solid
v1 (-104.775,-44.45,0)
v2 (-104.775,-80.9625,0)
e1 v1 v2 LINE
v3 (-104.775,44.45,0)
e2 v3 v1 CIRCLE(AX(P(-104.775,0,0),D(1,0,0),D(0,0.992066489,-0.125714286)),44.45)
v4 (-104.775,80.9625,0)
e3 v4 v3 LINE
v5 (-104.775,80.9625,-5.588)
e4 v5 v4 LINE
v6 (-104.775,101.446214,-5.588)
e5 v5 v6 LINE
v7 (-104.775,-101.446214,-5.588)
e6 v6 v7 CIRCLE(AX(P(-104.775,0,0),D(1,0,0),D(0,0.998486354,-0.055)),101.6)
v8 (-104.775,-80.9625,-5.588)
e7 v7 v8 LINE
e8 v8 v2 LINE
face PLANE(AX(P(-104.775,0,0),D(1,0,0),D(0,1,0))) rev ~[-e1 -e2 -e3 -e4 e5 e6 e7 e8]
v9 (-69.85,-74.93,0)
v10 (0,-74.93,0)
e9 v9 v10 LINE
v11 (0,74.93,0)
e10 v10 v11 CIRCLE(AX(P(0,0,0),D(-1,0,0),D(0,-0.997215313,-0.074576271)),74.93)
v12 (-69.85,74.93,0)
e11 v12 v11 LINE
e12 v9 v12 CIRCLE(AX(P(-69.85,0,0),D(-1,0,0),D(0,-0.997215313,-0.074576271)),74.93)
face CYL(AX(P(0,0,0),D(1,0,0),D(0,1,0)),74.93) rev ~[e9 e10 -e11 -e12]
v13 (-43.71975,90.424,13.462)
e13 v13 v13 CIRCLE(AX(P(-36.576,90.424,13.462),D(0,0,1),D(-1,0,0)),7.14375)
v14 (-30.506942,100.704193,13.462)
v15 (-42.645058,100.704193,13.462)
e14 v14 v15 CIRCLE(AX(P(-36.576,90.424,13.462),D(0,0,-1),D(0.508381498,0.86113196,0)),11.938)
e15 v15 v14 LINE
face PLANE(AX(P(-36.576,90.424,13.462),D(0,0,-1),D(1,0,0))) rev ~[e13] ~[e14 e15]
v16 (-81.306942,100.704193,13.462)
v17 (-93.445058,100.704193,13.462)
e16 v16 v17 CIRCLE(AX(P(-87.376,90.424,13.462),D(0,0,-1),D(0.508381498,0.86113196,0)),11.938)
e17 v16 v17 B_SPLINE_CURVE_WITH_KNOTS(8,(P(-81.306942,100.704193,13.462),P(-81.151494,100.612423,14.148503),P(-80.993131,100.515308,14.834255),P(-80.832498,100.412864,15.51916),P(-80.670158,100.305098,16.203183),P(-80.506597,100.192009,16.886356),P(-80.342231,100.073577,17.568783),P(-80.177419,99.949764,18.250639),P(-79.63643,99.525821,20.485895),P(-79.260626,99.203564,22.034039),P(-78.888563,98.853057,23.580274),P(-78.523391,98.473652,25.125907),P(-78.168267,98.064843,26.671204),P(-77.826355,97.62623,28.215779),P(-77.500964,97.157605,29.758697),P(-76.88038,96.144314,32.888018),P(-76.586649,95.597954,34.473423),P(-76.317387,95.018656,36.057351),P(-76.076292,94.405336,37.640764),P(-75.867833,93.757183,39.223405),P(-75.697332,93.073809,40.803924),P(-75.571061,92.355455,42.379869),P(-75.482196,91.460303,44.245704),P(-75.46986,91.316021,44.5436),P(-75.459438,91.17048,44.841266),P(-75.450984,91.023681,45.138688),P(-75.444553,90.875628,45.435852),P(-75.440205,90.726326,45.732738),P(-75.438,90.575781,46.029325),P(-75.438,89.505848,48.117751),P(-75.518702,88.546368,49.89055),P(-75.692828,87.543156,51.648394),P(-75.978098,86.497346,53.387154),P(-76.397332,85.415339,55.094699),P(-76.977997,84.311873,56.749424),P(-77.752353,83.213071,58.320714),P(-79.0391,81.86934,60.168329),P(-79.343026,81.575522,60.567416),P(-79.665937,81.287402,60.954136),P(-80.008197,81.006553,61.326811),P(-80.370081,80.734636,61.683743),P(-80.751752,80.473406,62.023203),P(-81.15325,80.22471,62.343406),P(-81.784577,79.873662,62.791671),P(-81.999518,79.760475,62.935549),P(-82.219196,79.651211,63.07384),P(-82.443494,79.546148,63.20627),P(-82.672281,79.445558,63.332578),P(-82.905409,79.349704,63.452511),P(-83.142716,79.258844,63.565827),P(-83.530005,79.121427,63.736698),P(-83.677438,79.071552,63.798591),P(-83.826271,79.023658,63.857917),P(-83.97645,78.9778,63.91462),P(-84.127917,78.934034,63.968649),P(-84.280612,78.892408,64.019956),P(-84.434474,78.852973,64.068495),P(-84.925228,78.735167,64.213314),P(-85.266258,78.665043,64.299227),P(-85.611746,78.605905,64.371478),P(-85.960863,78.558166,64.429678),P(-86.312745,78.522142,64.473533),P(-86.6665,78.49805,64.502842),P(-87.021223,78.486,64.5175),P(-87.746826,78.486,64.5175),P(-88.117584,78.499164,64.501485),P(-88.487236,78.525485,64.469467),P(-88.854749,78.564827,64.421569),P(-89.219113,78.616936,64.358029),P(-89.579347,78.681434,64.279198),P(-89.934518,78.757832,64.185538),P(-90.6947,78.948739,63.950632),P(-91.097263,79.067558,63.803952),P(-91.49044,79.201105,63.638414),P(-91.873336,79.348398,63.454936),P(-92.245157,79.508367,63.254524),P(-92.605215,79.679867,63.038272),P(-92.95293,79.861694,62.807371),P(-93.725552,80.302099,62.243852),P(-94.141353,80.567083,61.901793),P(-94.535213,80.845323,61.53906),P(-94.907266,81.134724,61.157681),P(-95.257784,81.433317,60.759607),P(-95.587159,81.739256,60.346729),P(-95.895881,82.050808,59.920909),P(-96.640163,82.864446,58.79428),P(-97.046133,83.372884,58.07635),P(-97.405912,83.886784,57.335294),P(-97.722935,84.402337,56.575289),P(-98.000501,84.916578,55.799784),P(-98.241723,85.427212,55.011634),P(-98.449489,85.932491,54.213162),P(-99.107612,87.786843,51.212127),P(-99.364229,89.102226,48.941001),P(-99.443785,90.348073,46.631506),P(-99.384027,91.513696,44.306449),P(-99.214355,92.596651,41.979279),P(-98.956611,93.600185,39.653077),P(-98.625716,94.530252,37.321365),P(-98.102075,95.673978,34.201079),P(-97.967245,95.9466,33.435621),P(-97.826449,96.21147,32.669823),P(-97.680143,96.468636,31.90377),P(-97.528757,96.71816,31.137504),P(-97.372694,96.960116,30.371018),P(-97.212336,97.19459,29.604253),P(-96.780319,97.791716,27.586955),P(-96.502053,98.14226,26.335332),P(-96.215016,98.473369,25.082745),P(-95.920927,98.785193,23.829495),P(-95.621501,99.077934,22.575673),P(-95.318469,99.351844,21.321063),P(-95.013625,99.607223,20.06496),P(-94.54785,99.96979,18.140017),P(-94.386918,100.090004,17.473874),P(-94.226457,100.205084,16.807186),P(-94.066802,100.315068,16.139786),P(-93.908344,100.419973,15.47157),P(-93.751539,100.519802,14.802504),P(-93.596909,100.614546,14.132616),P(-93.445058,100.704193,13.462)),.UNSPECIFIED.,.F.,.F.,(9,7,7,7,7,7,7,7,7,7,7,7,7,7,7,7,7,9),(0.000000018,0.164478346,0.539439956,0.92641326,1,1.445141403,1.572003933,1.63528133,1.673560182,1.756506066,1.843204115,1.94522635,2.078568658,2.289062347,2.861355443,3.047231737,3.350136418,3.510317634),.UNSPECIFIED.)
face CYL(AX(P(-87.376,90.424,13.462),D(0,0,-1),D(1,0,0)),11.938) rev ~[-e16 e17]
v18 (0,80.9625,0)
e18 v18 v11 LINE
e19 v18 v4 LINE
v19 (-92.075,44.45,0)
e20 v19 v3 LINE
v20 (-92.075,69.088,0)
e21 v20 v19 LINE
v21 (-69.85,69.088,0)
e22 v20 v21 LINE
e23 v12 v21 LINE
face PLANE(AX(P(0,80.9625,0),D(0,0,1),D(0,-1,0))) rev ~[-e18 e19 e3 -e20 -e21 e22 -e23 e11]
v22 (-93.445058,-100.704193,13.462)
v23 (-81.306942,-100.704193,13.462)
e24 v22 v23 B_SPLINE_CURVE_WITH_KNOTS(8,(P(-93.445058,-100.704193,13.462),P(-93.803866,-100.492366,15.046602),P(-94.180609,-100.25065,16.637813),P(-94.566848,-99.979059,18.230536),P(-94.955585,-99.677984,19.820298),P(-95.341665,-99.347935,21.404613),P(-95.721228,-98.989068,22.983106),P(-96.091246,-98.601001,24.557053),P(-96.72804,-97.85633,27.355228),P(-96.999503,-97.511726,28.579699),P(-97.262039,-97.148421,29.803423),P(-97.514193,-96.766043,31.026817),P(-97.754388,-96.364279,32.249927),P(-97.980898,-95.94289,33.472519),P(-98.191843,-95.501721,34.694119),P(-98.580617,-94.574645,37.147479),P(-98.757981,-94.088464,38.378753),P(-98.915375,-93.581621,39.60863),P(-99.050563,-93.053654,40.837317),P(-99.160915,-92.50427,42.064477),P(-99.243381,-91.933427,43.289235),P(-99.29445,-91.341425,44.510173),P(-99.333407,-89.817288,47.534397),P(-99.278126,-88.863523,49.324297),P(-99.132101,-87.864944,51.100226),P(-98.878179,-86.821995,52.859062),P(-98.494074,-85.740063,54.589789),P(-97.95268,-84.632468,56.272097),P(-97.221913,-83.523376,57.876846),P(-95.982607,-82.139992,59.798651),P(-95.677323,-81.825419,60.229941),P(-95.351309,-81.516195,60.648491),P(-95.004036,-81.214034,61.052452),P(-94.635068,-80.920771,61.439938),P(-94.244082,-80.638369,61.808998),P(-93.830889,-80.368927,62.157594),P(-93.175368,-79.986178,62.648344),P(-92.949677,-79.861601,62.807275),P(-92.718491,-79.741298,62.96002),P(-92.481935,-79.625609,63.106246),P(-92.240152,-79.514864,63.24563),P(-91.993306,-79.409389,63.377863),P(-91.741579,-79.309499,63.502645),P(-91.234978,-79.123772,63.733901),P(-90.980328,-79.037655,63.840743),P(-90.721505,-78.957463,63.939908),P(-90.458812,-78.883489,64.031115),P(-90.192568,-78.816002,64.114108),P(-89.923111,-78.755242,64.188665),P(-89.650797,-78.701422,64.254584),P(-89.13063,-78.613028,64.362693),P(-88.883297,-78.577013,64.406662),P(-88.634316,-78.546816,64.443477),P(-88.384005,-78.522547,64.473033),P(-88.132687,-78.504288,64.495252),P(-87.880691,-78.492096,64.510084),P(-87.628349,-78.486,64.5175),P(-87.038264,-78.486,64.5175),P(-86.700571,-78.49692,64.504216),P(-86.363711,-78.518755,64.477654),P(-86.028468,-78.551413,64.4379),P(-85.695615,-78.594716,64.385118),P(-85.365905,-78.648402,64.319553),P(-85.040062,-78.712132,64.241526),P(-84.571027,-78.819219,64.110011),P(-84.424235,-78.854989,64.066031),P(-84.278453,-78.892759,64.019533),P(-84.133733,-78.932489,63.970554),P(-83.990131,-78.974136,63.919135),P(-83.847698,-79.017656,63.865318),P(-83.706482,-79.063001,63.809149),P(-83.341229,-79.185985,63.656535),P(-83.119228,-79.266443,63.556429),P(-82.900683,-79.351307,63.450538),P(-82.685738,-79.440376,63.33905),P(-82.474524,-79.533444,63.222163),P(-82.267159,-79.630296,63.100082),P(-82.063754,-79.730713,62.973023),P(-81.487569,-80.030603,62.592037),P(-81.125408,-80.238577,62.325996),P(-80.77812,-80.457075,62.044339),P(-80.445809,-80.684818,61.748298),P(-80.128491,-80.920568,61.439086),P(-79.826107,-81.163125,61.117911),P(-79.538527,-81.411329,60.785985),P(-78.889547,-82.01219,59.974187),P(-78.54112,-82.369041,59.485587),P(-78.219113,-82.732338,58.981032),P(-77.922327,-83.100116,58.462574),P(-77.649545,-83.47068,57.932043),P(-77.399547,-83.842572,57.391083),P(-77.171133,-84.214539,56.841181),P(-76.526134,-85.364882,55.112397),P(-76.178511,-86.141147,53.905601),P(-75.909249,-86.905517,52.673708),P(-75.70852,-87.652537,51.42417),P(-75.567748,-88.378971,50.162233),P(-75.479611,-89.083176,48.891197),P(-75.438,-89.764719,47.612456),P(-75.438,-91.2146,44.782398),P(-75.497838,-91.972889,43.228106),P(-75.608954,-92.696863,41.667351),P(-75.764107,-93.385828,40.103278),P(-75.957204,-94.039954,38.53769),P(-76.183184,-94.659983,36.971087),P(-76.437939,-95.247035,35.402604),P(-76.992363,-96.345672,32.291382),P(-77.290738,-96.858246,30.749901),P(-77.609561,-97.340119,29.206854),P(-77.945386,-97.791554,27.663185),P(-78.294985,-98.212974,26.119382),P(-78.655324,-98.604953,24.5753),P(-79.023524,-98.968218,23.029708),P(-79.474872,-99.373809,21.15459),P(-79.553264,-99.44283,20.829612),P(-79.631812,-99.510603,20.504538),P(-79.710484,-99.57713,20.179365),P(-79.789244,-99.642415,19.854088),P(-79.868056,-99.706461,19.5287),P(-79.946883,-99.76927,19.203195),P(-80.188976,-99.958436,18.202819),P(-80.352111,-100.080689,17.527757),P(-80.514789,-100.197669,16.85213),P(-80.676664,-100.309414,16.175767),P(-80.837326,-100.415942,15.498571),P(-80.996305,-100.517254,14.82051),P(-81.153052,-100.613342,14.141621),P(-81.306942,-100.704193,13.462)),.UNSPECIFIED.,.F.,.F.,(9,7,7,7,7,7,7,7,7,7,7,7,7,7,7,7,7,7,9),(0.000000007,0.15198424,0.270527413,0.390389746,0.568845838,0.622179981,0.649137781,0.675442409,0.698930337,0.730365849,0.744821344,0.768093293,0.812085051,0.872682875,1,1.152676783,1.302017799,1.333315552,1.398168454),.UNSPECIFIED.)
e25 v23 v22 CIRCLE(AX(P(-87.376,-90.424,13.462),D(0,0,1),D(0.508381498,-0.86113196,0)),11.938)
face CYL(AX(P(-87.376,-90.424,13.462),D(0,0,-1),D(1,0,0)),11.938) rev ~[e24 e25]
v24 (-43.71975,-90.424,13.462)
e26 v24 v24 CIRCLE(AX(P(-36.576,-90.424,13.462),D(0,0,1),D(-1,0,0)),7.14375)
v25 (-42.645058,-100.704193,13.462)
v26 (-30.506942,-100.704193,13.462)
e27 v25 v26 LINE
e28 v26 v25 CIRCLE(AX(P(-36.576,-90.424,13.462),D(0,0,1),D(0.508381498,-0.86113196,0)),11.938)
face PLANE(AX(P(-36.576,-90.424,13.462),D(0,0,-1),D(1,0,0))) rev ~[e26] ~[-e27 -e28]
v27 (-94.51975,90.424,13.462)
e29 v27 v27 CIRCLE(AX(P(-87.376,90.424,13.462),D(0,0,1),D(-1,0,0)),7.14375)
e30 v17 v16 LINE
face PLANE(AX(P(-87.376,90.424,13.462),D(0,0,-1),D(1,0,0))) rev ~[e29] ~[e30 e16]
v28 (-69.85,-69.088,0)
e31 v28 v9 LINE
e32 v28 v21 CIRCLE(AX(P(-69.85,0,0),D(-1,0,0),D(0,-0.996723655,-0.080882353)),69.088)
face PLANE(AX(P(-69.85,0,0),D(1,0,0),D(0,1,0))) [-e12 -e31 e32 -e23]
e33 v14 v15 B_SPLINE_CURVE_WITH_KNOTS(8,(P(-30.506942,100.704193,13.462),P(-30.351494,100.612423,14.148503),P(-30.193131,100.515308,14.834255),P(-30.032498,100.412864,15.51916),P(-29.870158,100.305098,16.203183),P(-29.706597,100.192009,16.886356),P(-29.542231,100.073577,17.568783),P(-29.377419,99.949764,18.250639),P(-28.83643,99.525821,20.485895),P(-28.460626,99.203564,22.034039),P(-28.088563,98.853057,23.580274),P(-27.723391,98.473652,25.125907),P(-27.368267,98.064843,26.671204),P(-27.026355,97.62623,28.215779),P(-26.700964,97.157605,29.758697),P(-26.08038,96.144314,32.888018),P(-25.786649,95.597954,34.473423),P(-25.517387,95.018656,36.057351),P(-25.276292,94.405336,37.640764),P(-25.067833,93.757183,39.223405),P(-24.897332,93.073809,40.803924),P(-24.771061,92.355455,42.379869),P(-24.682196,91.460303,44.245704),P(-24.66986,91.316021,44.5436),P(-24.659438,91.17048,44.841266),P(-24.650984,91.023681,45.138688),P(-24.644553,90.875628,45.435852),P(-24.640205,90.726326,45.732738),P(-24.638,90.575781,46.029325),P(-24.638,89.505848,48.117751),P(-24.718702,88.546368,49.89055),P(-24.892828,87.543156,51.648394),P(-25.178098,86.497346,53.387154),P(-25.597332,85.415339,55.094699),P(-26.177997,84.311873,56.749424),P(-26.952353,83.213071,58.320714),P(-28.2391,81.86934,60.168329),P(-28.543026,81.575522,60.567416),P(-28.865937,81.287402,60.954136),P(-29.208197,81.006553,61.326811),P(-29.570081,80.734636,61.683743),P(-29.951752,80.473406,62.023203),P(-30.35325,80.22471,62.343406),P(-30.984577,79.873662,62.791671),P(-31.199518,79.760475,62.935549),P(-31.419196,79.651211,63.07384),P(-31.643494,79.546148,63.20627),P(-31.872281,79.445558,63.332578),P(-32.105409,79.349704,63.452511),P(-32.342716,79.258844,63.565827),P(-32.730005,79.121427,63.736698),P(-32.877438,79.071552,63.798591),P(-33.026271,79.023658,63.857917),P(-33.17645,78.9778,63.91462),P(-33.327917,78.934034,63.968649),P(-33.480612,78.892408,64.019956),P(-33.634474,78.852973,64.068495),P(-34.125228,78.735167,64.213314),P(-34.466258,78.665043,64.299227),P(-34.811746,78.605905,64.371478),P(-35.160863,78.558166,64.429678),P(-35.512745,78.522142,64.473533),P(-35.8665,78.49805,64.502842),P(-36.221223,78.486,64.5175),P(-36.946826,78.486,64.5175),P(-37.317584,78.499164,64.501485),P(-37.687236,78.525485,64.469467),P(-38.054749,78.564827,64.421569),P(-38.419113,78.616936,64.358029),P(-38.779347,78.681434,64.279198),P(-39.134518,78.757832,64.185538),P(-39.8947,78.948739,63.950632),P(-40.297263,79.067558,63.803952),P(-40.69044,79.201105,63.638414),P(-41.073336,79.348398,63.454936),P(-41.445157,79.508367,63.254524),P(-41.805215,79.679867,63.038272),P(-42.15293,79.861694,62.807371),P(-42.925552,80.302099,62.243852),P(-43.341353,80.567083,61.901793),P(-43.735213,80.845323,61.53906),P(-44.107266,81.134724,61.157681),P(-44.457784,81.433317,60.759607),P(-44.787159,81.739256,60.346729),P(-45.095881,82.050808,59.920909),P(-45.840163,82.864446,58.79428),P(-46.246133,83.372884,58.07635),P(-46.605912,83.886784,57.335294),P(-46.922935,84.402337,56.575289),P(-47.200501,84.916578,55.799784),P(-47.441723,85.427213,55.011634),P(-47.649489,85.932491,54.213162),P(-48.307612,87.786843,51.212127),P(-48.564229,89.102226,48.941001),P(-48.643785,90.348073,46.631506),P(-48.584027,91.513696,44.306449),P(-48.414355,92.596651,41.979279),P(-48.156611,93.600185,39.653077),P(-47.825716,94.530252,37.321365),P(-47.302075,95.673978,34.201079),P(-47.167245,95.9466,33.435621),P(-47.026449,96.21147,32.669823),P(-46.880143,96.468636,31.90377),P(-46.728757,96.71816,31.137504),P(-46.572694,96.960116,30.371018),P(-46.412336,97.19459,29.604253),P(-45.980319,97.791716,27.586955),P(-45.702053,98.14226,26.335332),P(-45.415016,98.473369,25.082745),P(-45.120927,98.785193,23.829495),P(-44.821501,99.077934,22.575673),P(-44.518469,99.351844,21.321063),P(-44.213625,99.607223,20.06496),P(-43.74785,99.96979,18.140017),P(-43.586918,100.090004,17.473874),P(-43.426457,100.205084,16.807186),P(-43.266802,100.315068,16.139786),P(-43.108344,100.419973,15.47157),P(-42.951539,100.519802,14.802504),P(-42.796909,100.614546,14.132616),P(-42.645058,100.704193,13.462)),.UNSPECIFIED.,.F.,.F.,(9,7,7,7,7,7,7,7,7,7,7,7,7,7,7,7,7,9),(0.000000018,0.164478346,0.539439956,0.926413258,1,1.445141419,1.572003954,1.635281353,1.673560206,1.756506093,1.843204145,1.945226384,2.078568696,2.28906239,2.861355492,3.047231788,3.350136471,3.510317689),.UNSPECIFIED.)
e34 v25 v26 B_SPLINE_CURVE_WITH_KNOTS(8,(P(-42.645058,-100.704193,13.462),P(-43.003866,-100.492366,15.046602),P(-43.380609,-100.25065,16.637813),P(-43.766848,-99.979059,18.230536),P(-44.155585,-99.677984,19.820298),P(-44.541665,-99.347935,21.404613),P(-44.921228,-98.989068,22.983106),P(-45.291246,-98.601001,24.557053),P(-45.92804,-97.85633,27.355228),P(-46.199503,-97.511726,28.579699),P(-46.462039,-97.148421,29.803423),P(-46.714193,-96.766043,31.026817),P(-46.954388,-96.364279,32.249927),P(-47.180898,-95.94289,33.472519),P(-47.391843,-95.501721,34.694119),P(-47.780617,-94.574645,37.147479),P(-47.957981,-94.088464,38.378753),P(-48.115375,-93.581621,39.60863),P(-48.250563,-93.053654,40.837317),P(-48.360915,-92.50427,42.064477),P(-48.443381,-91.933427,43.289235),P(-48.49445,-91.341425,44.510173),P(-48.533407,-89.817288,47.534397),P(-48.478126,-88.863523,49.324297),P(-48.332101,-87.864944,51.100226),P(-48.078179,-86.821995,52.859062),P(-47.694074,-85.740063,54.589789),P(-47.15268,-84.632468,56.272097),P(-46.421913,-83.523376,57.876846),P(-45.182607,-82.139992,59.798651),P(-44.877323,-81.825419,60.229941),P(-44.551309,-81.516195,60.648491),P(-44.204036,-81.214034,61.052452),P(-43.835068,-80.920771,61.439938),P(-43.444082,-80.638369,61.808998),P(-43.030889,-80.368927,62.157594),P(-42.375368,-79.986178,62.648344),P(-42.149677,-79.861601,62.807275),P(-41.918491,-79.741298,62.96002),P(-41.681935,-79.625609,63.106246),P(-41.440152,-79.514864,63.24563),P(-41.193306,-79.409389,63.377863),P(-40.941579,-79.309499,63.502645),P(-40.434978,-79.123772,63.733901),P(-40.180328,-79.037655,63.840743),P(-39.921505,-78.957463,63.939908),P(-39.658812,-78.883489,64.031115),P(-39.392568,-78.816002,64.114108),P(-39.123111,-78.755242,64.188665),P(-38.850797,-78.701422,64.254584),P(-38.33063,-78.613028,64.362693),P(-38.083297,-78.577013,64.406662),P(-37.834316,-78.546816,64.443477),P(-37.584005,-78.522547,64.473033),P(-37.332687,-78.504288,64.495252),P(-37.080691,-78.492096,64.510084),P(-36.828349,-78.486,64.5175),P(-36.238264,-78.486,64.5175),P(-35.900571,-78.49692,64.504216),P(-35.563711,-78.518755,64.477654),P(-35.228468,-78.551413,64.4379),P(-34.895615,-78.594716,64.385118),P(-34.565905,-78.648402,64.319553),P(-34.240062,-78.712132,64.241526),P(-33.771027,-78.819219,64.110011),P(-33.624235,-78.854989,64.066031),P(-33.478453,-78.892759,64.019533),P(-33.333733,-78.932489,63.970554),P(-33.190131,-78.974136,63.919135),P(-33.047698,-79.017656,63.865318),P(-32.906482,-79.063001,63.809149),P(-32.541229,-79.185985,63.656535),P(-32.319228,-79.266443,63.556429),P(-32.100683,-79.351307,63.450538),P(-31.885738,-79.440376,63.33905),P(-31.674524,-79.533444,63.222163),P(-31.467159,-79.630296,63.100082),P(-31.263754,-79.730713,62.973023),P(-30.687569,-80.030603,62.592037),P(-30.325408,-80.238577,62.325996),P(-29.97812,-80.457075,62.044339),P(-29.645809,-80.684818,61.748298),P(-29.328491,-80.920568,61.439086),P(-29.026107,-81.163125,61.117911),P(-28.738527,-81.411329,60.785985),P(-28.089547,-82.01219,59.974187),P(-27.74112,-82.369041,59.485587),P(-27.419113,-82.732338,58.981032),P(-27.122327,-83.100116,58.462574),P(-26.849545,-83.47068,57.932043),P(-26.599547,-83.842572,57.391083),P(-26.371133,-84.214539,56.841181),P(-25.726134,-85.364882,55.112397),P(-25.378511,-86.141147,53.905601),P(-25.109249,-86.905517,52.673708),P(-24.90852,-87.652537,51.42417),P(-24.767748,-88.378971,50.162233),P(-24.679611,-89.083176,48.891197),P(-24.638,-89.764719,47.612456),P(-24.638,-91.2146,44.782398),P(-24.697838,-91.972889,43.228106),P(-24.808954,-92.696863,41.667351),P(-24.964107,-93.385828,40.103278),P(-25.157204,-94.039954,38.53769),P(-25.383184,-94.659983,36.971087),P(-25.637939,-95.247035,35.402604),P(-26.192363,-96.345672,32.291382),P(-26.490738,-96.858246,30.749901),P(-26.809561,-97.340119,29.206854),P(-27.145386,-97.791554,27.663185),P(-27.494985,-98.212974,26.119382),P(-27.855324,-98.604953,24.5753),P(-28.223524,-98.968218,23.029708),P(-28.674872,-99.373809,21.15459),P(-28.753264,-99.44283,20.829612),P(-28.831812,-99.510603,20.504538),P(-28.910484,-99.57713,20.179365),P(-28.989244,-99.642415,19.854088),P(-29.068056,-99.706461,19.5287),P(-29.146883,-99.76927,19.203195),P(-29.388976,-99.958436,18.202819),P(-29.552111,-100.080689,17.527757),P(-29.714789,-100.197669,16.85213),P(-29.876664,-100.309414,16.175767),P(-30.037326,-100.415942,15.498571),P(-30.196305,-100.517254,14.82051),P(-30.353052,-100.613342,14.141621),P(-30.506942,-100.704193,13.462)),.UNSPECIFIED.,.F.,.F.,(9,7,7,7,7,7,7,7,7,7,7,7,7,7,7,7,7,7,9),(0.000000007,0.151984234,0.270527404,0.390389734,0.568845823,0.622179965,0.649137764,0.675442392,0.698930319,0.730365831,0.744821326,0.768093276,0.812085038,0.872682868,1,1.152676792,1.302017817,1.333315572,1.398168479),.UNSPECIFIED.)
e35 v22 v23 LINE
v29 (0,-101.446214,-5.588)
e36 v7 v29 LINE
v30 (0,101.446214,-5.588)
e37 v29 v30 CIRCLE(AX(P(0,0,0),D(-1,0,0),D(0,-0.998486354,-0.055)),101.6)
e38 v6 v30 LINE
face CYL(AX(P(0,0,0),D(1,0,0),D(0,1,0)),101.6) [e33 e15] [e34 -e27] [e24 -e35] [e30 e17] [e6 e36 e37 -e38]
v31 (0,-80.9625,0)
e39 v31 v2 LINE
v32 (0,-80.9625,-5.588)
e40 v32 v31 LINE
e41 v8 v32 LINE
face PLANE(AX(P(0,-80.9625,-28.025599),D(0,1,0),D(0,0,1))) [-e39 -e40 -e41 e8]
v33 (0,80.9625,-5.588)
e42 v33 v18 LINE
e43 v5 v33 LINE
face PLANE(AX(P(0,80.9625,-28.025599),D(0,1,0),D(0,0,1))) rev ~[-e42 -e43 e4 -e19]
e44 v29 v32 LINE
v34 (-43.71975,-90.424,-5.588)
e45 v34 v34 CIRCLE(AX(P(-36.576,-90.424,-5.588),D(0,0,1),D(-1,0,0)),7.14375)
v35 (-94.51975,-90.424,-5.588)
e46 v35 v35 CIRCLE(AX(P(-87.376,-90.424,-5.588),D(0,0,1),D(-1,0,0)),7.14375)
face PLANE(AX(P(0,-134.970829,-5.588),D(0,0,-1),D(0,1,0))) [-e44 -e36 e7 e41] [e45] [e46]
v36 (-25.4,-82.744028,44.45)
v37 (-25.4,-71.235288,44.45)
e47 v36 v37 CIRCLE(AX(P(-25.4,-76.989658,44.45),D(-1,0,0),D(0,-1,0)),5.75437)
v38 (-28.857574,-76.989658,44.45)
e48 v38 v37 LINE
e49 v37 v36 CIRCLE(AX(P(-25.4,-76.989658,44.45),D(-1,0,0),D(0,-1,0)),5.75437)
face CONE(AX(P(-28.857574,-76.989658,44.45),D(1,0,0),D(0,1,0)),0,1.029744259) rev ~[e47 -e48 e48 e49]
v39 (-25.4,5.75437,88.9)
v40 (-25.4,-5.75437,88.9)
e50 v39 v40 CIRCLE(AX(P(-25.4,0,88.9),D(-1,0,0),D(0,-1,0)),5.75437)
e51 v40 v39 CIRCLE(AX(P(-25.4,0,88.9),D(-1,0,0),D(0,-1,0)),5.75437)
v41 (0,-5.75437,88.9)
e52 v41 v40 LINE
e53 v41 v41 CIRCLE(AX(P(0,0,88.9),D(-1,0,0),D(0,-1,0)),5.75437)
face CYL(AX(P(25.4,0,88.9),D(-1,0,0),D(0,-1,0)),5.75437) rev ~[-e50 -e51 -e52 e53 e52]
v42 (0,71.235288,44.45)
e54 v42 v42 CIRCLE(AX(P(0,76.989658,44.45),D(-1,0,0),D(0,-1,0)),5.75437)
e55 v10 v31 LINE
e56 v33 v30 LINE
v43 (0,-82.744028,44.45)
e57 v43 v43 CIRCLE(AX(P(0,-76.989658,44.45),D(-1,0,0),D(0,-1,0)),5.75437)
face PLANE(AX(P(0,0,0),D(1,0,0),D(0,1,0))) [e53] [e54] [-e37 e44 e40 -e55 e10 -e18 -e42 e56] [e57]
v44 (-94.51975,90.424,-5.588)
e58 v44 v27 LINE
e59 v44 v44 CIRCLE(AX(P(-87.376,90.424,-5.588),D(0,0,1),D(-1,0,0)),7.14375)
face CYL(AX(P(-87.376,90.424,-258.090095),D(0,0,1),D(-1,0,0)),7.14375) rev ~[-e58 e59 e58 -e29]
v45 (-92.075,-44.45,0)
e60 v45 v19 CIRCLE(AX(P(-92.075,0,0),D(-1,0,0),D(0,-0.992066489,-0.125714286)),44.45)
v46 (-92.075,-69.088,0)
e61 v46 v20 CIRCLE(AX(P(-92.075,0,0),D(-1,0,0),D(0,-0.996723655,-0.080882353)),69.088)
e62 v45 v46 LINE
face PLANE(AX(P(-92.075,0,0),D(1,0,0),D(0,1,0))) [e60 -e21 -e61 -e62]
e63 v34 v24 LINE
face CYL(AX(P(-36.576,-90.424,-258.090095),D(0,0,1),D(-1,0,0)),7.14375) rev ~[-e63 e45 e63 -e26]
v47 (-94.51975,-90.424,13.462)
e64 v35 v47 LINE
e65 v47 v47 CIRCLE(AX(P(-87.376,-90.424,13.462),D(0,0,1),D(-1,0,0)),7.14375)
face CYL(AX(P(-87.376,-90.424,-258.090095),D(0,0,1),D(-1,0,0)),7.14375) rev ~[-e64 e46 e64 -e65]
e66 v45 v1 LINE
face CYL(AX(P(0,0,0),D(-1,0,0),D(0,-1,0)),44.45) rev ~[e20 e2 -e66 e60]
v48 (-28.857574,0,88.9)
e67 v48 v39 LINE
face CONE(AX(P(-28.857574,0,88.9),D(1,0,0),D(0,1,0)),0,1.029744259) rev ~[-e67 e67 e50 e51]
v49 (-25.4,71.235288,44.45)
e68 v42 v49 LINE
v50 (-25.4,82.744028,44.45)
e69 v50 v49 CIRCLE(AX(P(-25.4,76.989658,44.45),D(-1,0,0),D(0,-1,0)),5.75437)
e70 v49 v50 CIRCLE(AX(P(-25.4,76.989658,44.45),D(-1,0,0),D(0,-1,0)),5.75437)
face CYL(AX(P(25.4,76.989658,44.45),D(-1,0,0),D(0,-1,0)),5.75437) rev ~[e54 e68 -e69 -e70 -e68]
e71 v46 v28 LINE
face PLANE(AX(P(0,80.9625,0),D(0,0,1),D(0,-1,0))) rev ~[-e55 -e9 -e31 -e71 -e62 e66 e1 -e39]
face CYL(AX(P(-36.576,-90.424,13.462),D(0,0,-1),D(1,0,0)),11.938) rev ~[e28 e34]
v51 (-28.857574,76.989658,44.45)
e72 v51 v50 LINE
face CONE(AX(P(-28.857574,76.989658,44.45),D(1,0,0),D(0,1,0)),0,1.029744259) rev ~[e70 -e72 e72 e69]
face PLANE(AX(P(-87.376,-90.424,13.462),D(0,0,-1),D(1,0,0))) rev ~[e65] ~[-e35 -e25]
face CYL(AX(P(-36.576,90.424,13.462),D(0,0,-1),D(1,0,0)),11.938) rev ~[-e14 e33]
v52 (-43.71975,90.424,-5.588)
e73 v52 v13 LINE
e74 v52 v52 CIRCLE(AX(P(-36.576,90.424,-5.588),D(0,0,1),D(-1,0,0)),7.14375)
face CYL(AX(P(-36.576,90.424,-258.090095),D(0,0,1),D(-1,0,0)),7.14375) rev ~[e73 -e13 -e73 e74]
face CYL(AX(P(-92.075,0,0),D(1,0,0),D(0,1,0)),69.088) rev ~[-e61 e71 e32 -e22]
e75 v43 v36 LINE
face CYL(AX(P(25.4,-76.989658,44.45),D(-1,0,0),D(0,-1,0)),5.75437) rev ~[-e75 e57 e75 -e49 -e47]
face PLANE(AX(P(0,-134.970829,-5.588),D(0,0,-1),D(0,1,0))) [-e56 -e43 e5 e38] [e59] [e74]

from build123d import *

# Parameters (mm, degrees)
F0_R           = 101.6
F1_DEPTH       = 104.775
F3_D           = 88.9
F3_CBORE_D     = 138.176
F3_CBORE_DEPTH = 92.075
F4_R           = 74.93
F5_DEPTH       = 69.85
F6_W           = 288.5075062513
F6_H           = 97.8503401275
F7_DEPTH       = 104.776
F8_W           = 80.9625
F8_H           = 28.0255991966
F9_DEPTH       = 104.776
F11_D          = 14.2875
F13_R          = 11.938
F14_DEPTH      = 88.1390001
F16_D          = 11.50874
F16_DEPTH      = 25.4
F16_TIP        = 3.4575743203


# Not quite as in the source:
# - a length typed as a fraction of an inch, garbled in the dataset ("3 / 203.2 mm" for 3/8 in), is restored


with BuildPart() as f1:
    # F0 (on Right) → F1 (new body)
    with BuildSketch(Plane.YZ):
        Circle(F0_R)
    extrude(amount=-F1_DEPTH)

    # F3 (through all)
    with Locations(Plane.YZ):
        with Locations((0, 0)):
            CounterBoreHole(F3_D / 2, F3_CBORE_D / 2, F3_CBORE_DEPTH)

    # F4 (on face) → F5 (cut)
    with BuildSketch(Plane.YZ):
        Circle(F4_R)
    extrude(amount=-F5_DEPTH, mode=Mode.SUBTRACT)

    # F6 (on face) → F7 (cut, through all)
    with BuildSketch(Plane.YZ):
        with Locations((9.2829242349, -54.5131700637)):
            Rectangle(F6_W, F6_H)
    extrude(amount=-F7_DEPTH, mode=Mode.SUBTRACT)

    # F8 (on face) → F9 (cut, through all)
    with BuildSketch(Plane.YZ):
        with Locations((-40.48125, -14.0127995983)):
            Rectangle(F8_W, F8_H)
        with Locations((40.48125, -14.0127995983)):
            Rectangle(F8_W, F8_H)
    extrude(amount=-F9_DEPTH, mode=Mode.SUBTRACT)

    # F11 (through all)
    with Locations(Plane(origin=(0, 0, -5.588), x_dir=(1, 0, 0), z_dir=(0, 0, -1))):
        with Locations((-36.576, 90.424), (-87.376, 90.424), (-36.576, -90.424), (-87.376, -90.424)):
            Hole(F11_D / 2)

    # F13 (on offset) → F14 (cut, through all)
    with BuildSketch(Plane(origin=(0, 0, 13.462), x_dir=(1, 0, 0), z_dir=(0, 0, -1))):
        with Locations((-87.376, 90.424)):
            Circle(F13_R)
        with Locations((-36.576, 90.424)):
            Circle(F13_R)
        with Locations((-87.376, -90.424)):
            Circle(F13_R)
        with Locations((-36.576, -90.424)):
            Circle(F13_R)
    extrude(amount=-F14_DEPTH, mode=Mode.SUBTRACT)

    # F16
    with Locations(Plane.YZ):
        with Locations((-76.9896583964, 44.45), (0, 88.9), (76.9896583964, 44.45)):
            Hole(F16_D / 2, depth=F16_DEPTH)
            with Locations((0, 0, -(F16_DEPTH + F16_TIP / 2))):  # 118° drill point
                Cone(0, F16_D / 2, F16_TIP, mode=Mode.SUBTRACT)


solid = f1.part
